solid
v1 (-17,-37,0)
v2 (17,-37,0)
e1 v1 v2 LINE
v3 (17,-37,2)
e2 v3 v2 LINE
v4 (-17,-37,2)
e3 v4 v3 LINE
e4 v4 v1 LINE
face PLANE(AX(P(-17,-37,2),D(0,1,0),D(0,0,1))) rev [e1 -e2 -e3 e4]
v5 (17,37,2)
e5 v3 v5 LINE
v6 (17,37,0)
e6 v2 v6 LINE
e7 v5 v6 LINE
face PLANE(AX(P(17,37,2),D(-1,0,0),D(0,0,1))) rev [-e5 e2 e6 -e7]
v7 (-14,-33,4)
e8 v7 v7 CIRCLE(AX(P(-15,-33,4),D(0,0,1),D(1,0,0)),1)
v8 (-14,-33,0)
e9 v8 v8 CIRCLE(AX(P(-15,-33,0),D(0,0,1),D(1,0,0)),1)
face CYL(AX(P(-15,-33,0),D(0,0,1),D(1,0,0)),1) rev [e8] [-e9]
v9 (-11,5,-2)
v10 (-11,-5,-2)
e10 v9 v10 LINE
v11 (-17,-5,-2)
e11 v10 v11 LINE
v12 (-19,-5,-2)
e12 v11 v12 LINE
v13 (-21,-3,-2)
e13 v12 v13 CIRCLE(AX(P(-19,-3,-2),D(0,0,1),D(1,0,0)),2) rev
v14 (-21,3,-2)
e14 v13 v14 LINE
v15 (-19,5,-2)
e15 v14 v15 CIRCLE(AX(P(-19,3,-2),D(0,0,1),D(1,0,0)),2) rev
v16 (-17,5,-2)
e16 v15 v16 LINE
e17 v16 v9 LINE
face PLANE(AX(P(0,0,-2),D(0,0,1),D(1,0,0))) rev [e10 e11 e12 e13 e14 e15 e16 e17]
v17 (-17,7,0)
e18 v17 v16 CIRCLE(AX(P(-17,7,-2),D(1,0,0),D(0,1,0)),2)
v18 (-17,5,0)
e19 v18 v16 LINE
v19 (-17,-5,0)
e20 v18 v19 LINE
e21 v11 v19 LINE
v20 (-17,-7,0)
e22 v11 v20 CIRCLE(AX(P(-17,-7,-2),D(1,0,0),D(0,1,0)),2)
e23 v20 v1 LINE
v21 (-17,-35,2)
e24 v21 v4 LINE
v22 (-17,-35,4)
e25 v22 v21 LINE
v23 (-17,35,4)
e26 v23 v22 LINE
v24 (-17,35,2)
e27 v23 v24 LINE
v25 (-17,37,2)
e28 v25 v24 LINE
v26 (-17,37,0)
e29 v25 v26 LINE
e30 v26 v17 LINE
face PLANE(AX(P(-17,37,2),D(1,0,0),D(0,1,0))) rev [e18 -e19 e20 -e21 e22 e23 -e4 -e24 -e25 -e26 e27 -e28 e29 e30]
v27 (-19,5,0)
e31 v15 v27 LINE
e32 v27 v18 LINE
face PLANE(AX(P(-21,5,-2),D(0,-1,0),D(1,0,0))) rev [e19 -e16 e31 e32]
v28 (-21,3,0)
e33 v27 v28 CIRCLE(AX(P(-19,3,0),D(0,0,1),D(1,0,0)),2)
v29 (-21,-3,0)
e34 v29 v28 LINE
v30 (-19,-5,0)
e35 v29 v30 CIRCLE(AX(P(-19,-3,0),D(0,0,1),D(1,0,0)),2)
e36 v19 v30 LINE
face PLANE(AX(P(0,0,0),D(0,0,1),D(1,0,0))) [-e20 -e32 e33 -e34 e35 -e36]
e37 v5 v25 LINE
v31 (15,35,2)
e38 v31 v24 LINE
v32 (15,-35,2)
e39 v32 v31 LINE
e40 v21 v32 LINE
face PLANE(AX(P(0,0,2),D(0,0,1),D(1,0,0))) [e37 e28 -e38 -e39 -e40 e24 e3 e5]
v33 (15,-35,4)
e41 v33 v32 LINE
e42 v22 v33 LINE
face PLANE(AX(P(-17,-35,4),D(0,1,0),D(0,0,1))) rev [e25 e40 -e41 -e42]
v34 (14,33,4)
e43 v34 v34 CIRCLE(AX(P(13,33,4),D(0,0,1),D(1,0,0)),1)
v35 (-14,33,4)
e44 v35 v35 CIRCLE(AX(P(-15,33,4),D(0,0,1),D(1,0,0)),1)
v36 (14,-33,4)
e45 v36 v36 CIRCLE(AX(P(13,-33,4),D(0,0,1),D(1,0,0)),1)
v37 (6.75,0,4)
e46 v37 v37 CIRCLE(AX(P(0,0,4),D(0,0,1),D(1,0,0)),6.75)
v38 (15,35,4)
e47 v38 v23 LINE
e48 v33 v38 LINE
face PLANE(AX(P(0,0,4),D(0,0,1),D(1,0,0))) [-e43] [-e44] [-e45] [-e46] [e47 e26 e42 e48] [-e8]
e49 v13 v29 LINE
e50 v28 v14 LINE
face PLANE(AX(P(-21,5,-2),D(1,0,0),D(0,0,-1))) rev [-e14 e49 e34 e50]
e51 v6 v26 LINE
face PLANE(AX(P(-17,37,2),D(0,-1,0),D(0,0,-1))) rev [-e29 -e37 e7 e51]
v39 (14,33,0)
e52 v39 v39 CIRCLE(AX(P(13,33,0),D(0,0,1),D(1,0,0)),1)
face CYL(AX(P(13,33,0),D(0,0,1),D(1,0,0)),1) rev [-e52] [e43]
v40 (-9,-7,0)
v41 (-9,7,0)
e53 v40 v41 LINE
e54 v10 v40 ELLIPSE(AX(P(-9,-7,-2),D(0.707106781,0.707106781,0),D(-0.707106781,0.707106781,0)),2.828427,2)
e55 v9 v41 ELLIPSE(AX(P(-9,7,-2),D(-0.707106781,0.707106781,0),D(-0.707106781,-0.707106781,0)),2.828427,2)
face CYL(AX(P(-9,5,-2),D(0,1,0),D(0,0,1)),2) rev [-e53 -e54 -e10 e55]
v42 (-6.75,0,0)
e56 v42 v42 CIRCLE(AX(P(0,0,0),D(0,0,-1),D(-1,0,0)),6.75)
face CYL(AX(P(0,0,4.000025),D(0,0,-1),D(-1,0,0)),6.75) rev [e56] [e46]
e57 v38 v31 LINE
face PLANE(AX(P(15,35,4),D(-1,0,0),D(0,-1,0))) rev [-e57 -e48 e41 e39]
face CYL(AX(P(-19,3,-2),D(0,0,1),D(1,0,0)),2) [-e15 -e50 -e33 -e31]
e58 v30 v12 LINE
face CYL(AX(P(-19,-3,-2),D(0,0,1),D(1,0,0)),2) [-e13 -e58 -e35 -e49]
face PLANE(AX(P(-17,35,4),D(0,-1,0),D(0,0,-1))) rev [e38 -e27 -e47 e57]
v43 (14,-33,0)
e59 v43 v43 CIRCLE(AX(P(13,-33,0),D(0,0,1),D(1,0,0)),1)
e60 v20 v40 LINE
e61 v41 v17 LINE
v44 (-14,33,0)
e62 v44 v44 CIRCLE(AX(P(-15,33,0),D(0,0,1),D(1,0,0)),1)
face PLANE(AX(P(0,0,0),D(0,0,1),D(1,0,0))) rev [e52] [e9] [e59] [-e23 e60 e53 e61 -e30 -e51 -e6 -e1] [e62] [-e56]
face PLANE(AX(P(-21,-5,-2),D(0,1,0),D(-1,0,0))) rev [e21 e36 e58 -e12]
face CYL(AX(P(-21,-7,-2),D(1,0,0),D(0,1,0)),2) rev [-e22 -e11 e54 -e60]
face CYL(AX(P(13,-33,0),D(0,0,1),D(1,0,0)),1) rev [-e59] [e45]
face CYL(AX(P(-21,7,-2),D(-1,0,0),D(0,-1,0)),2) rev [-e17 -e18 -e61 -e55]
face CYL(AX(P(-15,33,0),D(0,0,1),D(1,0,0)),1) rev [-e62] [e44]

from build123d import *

# Parameters (mm, degrees)
ESQUISSE1_W             = 34
ESQUISSE1_H             = 74
BOSS_EXTRU_1_DEPTH      = 2
ESQUISSE2_W             = 32
ESQUISSE2_H             = 70
BOSS_EXTRU_2_DEPTH      = 2
SKETCH1_R               = 6.75
CUT_EXTRUDE1_DEPTH      = 41.914545091
ESQUISSE3_R             = 1
ENL_V_MAT_EXTRU_1_DEPTH = 41.914545091
ESQUISSE4_W             = 10
ESQUISSE4_H             = 10
BOSS_EXTRU_3_DEPTH      = 2
CONG_1_R                = 2


with BuildPart() as part:
    # Esquisse1 → Boss.-Extru.1 (new body)
    with BuildSketch(Plane.XY):
        Rectangle(ESQUISSE1_W, ESQUISSE1_H)
    extrude(amount=BOSS_EXTRU_1_DEPTH)

    # Esquisse2 → Boss.-Extru.2 (add)
    with BuildSketch(Plane.XY.offset(2)):
        with Locations((-1, 0)):
            Rectangle(ESQUISSE2_W, ESQUISSE2_H)
    extrude(amount=BOSS_EXTRU_2_DEPTH)

    # Sketch1 → Cut-Extrude1 (cut, through all)
    with BuildSketch(Plane(origin=(0, 0, 0), x_dir=(-1, 0, 0), z_dir=(0, 0, -1))):
        Circle(SKETCH1_R)
    extrude(amount=-CUT_EXTRUDE1_DEPTH, mode=Mode.SUBTRACT)

    # Esquisse3 → Enlèv. mat.-Extru.1 (cut, through all)
    with BuildSketch(Plane.XY.offset(4)):
        with Locations((-15, 33)):
            Circle(ESQUISSE3_R)
        with Locations((13, 33)):
            Circle(ESQUISSE3_R)
        with Locations((13, -33)):
            Circle(ESQUISSE3_R)
        with Locations((-15, -33)):
            Circle(ESQUISSE3_R)
    extrude(amount=-ENL_V_MAT_EXTRU_1_DEPTH, mode=Mode.SUBTRACT)

    # Esquisse4 → Boss.-Extru.3 (add)
    with BuildSketch(Plane(origin=(0, 0, 0), x_dir=(-1, 0, 0), z_dir=(0, 0, -1))):
        with Locations((16, 0)):
            Rectangle(ESQUISSE4_W, ESQUISSE4_H)
    extrude(amount=BOSS_EXTRU_3_DEPTH)

    # Congé1
    cong_1_edges = [part.edges().sort_by_distance(p)[0] for p in [
        (-14, -5, 0),
        (-11, 0, 0),
        (-14, 5, 0),
        (-21, 5, -1),
        (-21, -5, -1),
    ]]
    fillet(cong_1_edges, radius=CONG_1_R - 0.0001)  # a hair under: the kernel refuses the full size


solid = part.part
